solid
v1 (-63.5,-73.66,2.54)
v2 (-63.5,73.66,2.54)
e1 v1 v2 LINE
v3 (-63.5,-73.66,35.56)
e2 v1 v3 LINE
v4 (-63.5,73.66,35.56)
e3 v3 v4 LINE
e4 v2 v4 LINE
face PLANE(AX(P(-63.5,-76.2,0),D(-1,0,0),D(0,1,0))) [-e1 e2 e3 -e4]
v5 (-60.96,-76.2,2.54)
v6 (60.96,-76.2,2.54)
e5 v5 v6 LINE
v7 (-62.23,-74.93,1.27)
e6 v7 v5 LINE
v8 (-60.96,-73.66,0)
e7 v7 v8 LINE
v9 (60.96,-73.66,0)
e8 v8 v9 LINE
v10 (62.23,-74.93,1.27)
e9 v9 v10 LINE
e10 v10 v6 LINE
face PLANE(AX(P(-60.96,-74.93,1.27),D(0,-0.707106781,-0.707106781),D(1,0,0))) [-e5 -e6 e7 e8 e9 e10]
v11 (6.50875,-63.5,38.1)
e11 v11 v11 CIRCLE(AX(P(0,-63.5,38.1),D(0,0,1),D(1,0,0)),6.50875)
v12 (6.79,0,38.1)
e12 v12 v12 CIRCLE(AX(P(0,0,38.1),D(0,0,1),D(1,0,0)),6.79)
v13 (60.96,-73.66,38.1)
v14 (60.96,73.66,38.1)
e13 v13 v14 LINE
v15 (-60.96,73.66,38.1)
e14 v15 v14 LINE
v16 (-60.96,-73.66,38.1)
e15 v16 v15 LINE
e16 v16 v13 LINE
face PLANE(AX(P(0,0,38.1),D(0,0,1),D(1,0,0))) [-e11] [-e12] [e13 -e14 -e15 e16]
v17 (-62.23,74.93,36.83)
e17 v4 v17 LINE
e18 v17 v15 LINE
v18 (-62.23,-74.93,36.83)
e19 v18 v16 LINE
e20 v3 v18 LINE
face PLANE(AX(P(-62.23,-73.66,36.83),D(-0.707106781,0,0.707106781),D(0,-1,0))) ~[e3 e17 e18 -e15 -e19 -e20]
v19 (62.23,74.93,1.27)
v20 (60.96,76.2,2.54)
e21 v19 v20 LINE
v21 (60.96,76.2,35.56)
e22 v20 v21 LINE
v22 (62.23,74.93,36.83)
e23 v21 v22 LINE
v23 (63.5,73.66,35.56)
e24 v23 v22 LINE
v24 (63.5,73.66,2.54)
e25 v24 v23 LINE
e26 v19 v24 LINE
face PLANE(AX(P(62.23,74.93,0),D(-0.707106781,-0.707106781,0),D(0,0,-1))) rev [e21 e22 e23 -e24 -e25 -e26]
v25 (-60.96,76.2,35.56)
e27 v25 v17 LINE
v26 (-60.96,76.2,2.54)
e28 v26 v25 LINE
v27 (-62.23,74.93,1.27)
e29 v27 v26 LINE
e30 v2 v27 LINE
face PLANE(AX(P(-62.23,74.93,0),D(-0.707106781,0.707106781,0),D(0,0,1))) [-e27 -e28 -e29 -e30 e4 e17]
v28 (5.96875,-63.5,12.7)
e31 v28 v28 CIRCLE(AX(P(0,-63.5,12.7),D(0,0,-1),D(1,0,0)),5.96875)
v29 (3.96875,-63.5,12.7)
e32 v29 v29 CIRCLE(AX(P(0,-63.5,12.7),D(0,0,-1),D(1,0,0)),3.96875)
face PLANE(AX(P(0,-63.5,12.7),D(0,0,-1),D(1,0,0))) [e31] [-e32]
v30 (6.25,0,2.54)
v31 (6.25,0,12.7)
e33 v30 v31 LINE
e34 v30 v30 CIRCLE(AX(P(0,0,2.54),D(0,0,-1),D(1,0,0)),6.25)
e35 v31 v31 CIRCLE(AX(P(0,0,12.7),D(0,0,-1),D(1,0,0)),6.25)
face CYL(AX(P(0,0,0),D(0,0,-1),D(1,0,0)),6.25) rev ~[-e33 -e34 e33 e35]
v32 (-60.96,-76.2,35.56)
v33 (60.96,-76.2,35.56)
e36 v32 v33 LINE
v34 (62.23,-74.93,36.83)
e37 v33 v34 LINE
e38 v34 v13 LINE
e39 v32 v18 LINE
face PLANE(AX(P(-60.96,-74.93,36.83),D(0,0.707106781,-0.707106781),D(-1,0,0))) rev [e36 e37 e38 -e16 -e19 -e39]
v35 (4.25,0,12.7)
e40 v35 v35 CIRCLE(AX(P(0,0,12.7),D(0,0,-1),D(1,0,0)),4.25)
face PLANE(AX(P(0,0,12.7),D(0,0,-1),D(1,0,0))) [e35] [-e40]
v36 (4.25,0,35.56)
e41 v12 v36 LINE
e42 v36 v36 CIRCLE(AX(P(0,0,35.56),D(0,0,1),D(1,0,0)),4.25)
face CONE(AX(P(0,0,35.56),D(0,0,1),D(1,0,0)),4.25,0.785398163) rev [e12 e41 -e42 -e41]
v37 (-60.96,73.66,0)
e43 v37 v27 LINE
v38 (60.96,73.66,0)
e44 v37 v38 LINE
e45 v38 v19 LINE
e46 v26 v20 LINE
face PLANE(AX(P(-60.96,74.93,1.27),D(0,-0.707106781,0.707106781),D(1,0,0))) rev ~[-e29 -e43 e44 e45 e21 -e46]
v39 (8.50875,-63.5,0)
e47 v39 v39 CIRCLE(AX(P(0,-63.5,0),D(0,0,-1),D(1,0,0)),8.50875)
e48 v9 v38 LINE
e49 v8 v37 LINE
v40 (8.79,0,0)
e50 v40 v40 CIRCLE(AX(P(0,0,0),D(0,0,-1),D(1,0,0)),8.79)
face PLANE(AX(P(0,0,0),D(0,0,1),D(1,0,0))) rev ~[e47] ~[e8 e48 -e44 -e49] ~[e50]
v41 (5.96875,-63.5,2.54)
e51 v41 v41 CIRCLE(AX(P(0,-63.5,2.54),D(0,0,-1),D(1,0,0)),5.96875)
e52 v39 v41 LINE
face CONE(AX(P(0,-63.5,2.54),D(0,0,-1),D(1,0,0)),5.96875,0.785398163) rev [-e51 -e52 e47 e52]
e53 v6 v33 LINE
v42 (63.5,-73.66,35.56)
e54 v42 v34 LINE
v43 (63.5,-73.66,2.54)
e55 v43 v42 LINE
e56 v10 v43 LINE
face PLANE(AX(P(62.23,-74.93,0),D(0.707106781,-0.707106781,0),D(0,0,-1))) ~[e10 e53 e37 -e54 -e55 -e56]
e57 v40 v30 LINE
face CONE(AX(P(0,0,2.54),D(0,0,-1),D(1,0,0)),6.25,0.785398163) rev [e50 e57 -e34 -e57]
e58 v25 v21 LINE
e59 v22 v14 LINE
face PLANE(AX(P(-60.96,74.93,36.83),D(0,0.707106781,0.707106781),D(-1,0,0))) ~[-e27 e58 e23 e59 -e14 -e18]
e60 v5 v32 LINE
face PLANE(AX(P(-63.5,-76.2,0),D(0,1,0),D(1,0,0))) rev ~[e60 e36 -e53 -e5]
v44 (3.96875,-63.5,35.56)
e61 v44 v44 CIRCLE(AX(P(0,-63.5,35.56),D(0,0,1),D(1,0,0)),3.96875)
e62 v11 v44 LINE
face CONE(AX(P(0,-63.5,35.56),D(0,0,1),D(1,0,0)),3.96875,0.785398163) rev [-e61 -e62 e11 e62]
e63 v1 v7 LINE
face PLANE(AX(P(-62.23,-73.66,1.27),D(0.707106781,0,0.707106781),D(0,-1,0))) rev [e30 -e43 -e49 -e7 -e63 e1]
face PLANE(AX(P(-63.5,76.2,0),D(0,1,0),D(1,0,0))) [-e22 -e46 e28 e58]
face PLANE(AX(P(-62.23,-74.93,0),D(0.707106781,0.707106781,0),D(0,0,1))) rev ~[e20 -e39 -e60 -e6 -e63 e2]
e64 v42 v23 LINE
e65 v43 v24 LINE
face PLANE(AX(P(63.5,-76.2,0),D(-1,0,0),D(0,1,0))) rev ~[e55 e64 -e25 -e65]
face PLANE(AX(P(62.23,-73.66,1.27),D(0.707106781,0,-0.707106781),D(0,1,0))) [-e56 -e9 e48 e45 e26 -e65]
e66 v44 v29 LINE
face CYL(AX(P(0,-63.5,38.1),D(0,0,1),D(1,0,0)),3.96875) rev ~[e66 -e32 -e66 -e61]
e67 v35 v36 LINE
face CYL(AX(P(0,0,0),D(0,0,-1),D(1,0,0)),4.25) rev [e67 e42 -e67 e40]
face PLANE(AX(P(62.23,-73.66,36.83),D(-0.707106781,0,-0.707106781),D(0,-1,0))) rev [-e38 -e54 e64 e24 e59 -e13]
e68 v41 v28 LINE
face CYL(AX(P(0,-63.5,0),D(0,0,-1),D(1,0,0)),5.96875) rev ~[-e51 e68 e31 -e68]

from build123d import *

# Parameters (mm, degrees)
F0_W        = 127
F0_H        = 152.4
F0_R        = 4.25
F1_DEPTH    = 38.1
F3_R        = 3.96875
F4_DEPTH    = 50.8
F5_R        = 6.25
F5_R_2      = 4.25
F5_R_3      = 5.96875
F5_R_4      = 3.96875
F6_DEPTH    = 12.7
F7_C1_SIZE  = 2.54
F7_C2_SIZE  = 2.54
F7_C3_SIZE  = 2.54
F7_C4_SIZE  = 2.54
F7_C5_SIZE  = 2.54
F7_C6_SIZE  = 2.54
F7_C7_SIZE  = 2.54
F7_C8_SIZE  = 2.54
F7_C9_SIZE  = 2.54
F7_C10_SIZE = 2.54
F7_C11_SIZE = 2.54
F7_C12_SIZE = 2.54
F7_C13_SIZE = 2.54
F7_C14_SIZE = 2.54
F7_C15_SIZE = 2.54
F7_C16_SIZE = 2.54


# Not quite as in the source:
# - two fillets or chamfers of one size are made in one step
# - a feature names something its author has since deleted; it is built from what else it names


with BuildPart() as f1:
    # F0 (on Top) → F1 (new body)
    with BuildSketch(Plane.XY):
        Rectangle(F0_W, F0_H)
        Circle(F0_R, mode=Mode.SUBTRACT)
    extrude(amount=F1_DEPTH)

    # F3 (on face) → F4 (cut)
    with BuildSketch(Plane.XY.offset(38.1)):
        with Locations((0, -63.5)):
            Circle(F3_R)
    extrude(amount=-F4_DEPTH, mode=Mode.SUBTRACT)

    # F5 (on face) → F6 (cut)
    with BuildSketch(Plane(origin=(0, 0, 0), x_dir=(1, 0, 0), z_dir=(0, 0, -1))):
        Circle(F5_R)
        Circle(F5_R_2, mode=Mode.SUBTRACT)
        with Locations((0, 63.5)):
            Circle(F5_R_3)
        with Locations((0, 63.5)):
            Circle(F5_R_4, mode=Mode.SUBTRACT)
    extrude(amount=-F6_DEPTH, mode=Mode.SUBTRACT)

    # F7: chamfer of 2.54 on 16 edges, made by hand

    # F7_c1
    f7_c1_edges = [f1.edges().sort_by_distance(p)[0] for p in [
        (-63.5, -76.2, 19.05),
    ]]
    chamfer(f7_c1_edges, length=F7_C1_SIZE)

    # F7_c2
    f7_c2_edges = [f1.edges().sort_by_distance(p)[0] for p in [
        (63.5, -76.2, 19.05),
    ]]
    chamfer(f7_c2_edges, length=F7_C2_SIZE)

    # F7_c3
    f7_c3_edges = [f1.edges().sort_by_distance(p)[0] for p in [
        (0, -76.2, 0),
    ]]
    chamfer(f7_c3_edges, length=F7_C3_SIZE)

    # F7_c4
    f7_c4_edges = [f1.edges().sort_by_distance(p)[0] for p in [
        (0, -76.2, 38.1),
    ]]
    chamfer(f7_c4_edges, length=F7_C4_SIZE)

    # F7_c5
    f7_c5_edges = [f1.edges().sort_by_distance(p)[0] for p in [
        (-63.5, 76.2, 19.05),
    ]]
    chamfer(f7_c5_edges, length=F7_C5_SIZE)

    # F7_c6
    f7_c6_edges = [f1.edges().sort_by_distance(p)[0] for p in [
        (-63.5, 0, 0),
    ]]
    chamfer(f7_c6_edges, length=F7_C6_SIZE)

    # F7_c7
    f7_c7_edges = [f1.edges().sort_by_distance(p)[0] for p in [
        (-63.5, 0, 38.1),
    ]]
    chamfer(f7_c7_edges, length=F7_C7_SIZE)

    # F7_c8
    f7_c8_edges = [f1.edges().sort_by_distance(p)[0] for p in [
        (63.5, 76.2, 19.05),
    ]]
    chamfer(f7_c8_edges, length=F7_C8_SIZE)

    # F7_c9
    f7_c9_edges = [f1.edges().sort_by_distance(p)[0] for p in [
        (63.5, 0, 0),
    ]]
    chamfer(f7_c9_edges, length=F7_C9_SIZE)

    # F7_c10
    f7_c10_edges = [f1.edges().sort_by_distance(p)[0] for p in [
        (63.5, 0, 38.1),
    ]]
    chamfer(f7_c10_edges, length=F7_C10_SIZE)

    # F7_c11
    f7_c11_edges = [f1.edges().sort_by_distance(p)[0] for p in [
        (0, 76.2, 0),
    ]]
    chamfer(f7_c11_edges, length=F7_C11_SIZE)

    # F7_c12
    f7_c12_edges = [f1.edges().sort_by_distance(p)[0] for p in [
        (-5.96875, -63.5, 0),
    ]]
    chamfer(f7_c12_edges, length=F7_C12_SIZE)

    # F7_c13
    f7_c13_edges = [f1.edges().sort_by_distance(p)[0] for p in [
        (-6.25, 0, 0),
    ]]
    chamfer(f7_c13_edges, length=F7_C13_SIZE)

    # F7_c14
    f7_c14_edges = [f1.edges().sort_by_distance(p)[0] for p in [
        (0, 76.2, 38.1),
    ]]
    chamfer(f7_c14_edges, length=F7_C14_SIZE)

    # F7_c15
    f7_c15_edges = [f1.edges().sort_by_distance(p)[0] for p in [
        (-3.96875, -63.5, 38.1),
    ]]
    chamfer(f7_c15_edges, length=F7_C15_SIZE)

    # F7_c16
    f7_c16_edges = [f1.edges().sort_by_distance(p)[0] for p in [
        (-4.25, 0, 38.1),
    ]]
    chamfer(f7_c16_edges, length=F7_C16_SIZE)


solid = f1.part
